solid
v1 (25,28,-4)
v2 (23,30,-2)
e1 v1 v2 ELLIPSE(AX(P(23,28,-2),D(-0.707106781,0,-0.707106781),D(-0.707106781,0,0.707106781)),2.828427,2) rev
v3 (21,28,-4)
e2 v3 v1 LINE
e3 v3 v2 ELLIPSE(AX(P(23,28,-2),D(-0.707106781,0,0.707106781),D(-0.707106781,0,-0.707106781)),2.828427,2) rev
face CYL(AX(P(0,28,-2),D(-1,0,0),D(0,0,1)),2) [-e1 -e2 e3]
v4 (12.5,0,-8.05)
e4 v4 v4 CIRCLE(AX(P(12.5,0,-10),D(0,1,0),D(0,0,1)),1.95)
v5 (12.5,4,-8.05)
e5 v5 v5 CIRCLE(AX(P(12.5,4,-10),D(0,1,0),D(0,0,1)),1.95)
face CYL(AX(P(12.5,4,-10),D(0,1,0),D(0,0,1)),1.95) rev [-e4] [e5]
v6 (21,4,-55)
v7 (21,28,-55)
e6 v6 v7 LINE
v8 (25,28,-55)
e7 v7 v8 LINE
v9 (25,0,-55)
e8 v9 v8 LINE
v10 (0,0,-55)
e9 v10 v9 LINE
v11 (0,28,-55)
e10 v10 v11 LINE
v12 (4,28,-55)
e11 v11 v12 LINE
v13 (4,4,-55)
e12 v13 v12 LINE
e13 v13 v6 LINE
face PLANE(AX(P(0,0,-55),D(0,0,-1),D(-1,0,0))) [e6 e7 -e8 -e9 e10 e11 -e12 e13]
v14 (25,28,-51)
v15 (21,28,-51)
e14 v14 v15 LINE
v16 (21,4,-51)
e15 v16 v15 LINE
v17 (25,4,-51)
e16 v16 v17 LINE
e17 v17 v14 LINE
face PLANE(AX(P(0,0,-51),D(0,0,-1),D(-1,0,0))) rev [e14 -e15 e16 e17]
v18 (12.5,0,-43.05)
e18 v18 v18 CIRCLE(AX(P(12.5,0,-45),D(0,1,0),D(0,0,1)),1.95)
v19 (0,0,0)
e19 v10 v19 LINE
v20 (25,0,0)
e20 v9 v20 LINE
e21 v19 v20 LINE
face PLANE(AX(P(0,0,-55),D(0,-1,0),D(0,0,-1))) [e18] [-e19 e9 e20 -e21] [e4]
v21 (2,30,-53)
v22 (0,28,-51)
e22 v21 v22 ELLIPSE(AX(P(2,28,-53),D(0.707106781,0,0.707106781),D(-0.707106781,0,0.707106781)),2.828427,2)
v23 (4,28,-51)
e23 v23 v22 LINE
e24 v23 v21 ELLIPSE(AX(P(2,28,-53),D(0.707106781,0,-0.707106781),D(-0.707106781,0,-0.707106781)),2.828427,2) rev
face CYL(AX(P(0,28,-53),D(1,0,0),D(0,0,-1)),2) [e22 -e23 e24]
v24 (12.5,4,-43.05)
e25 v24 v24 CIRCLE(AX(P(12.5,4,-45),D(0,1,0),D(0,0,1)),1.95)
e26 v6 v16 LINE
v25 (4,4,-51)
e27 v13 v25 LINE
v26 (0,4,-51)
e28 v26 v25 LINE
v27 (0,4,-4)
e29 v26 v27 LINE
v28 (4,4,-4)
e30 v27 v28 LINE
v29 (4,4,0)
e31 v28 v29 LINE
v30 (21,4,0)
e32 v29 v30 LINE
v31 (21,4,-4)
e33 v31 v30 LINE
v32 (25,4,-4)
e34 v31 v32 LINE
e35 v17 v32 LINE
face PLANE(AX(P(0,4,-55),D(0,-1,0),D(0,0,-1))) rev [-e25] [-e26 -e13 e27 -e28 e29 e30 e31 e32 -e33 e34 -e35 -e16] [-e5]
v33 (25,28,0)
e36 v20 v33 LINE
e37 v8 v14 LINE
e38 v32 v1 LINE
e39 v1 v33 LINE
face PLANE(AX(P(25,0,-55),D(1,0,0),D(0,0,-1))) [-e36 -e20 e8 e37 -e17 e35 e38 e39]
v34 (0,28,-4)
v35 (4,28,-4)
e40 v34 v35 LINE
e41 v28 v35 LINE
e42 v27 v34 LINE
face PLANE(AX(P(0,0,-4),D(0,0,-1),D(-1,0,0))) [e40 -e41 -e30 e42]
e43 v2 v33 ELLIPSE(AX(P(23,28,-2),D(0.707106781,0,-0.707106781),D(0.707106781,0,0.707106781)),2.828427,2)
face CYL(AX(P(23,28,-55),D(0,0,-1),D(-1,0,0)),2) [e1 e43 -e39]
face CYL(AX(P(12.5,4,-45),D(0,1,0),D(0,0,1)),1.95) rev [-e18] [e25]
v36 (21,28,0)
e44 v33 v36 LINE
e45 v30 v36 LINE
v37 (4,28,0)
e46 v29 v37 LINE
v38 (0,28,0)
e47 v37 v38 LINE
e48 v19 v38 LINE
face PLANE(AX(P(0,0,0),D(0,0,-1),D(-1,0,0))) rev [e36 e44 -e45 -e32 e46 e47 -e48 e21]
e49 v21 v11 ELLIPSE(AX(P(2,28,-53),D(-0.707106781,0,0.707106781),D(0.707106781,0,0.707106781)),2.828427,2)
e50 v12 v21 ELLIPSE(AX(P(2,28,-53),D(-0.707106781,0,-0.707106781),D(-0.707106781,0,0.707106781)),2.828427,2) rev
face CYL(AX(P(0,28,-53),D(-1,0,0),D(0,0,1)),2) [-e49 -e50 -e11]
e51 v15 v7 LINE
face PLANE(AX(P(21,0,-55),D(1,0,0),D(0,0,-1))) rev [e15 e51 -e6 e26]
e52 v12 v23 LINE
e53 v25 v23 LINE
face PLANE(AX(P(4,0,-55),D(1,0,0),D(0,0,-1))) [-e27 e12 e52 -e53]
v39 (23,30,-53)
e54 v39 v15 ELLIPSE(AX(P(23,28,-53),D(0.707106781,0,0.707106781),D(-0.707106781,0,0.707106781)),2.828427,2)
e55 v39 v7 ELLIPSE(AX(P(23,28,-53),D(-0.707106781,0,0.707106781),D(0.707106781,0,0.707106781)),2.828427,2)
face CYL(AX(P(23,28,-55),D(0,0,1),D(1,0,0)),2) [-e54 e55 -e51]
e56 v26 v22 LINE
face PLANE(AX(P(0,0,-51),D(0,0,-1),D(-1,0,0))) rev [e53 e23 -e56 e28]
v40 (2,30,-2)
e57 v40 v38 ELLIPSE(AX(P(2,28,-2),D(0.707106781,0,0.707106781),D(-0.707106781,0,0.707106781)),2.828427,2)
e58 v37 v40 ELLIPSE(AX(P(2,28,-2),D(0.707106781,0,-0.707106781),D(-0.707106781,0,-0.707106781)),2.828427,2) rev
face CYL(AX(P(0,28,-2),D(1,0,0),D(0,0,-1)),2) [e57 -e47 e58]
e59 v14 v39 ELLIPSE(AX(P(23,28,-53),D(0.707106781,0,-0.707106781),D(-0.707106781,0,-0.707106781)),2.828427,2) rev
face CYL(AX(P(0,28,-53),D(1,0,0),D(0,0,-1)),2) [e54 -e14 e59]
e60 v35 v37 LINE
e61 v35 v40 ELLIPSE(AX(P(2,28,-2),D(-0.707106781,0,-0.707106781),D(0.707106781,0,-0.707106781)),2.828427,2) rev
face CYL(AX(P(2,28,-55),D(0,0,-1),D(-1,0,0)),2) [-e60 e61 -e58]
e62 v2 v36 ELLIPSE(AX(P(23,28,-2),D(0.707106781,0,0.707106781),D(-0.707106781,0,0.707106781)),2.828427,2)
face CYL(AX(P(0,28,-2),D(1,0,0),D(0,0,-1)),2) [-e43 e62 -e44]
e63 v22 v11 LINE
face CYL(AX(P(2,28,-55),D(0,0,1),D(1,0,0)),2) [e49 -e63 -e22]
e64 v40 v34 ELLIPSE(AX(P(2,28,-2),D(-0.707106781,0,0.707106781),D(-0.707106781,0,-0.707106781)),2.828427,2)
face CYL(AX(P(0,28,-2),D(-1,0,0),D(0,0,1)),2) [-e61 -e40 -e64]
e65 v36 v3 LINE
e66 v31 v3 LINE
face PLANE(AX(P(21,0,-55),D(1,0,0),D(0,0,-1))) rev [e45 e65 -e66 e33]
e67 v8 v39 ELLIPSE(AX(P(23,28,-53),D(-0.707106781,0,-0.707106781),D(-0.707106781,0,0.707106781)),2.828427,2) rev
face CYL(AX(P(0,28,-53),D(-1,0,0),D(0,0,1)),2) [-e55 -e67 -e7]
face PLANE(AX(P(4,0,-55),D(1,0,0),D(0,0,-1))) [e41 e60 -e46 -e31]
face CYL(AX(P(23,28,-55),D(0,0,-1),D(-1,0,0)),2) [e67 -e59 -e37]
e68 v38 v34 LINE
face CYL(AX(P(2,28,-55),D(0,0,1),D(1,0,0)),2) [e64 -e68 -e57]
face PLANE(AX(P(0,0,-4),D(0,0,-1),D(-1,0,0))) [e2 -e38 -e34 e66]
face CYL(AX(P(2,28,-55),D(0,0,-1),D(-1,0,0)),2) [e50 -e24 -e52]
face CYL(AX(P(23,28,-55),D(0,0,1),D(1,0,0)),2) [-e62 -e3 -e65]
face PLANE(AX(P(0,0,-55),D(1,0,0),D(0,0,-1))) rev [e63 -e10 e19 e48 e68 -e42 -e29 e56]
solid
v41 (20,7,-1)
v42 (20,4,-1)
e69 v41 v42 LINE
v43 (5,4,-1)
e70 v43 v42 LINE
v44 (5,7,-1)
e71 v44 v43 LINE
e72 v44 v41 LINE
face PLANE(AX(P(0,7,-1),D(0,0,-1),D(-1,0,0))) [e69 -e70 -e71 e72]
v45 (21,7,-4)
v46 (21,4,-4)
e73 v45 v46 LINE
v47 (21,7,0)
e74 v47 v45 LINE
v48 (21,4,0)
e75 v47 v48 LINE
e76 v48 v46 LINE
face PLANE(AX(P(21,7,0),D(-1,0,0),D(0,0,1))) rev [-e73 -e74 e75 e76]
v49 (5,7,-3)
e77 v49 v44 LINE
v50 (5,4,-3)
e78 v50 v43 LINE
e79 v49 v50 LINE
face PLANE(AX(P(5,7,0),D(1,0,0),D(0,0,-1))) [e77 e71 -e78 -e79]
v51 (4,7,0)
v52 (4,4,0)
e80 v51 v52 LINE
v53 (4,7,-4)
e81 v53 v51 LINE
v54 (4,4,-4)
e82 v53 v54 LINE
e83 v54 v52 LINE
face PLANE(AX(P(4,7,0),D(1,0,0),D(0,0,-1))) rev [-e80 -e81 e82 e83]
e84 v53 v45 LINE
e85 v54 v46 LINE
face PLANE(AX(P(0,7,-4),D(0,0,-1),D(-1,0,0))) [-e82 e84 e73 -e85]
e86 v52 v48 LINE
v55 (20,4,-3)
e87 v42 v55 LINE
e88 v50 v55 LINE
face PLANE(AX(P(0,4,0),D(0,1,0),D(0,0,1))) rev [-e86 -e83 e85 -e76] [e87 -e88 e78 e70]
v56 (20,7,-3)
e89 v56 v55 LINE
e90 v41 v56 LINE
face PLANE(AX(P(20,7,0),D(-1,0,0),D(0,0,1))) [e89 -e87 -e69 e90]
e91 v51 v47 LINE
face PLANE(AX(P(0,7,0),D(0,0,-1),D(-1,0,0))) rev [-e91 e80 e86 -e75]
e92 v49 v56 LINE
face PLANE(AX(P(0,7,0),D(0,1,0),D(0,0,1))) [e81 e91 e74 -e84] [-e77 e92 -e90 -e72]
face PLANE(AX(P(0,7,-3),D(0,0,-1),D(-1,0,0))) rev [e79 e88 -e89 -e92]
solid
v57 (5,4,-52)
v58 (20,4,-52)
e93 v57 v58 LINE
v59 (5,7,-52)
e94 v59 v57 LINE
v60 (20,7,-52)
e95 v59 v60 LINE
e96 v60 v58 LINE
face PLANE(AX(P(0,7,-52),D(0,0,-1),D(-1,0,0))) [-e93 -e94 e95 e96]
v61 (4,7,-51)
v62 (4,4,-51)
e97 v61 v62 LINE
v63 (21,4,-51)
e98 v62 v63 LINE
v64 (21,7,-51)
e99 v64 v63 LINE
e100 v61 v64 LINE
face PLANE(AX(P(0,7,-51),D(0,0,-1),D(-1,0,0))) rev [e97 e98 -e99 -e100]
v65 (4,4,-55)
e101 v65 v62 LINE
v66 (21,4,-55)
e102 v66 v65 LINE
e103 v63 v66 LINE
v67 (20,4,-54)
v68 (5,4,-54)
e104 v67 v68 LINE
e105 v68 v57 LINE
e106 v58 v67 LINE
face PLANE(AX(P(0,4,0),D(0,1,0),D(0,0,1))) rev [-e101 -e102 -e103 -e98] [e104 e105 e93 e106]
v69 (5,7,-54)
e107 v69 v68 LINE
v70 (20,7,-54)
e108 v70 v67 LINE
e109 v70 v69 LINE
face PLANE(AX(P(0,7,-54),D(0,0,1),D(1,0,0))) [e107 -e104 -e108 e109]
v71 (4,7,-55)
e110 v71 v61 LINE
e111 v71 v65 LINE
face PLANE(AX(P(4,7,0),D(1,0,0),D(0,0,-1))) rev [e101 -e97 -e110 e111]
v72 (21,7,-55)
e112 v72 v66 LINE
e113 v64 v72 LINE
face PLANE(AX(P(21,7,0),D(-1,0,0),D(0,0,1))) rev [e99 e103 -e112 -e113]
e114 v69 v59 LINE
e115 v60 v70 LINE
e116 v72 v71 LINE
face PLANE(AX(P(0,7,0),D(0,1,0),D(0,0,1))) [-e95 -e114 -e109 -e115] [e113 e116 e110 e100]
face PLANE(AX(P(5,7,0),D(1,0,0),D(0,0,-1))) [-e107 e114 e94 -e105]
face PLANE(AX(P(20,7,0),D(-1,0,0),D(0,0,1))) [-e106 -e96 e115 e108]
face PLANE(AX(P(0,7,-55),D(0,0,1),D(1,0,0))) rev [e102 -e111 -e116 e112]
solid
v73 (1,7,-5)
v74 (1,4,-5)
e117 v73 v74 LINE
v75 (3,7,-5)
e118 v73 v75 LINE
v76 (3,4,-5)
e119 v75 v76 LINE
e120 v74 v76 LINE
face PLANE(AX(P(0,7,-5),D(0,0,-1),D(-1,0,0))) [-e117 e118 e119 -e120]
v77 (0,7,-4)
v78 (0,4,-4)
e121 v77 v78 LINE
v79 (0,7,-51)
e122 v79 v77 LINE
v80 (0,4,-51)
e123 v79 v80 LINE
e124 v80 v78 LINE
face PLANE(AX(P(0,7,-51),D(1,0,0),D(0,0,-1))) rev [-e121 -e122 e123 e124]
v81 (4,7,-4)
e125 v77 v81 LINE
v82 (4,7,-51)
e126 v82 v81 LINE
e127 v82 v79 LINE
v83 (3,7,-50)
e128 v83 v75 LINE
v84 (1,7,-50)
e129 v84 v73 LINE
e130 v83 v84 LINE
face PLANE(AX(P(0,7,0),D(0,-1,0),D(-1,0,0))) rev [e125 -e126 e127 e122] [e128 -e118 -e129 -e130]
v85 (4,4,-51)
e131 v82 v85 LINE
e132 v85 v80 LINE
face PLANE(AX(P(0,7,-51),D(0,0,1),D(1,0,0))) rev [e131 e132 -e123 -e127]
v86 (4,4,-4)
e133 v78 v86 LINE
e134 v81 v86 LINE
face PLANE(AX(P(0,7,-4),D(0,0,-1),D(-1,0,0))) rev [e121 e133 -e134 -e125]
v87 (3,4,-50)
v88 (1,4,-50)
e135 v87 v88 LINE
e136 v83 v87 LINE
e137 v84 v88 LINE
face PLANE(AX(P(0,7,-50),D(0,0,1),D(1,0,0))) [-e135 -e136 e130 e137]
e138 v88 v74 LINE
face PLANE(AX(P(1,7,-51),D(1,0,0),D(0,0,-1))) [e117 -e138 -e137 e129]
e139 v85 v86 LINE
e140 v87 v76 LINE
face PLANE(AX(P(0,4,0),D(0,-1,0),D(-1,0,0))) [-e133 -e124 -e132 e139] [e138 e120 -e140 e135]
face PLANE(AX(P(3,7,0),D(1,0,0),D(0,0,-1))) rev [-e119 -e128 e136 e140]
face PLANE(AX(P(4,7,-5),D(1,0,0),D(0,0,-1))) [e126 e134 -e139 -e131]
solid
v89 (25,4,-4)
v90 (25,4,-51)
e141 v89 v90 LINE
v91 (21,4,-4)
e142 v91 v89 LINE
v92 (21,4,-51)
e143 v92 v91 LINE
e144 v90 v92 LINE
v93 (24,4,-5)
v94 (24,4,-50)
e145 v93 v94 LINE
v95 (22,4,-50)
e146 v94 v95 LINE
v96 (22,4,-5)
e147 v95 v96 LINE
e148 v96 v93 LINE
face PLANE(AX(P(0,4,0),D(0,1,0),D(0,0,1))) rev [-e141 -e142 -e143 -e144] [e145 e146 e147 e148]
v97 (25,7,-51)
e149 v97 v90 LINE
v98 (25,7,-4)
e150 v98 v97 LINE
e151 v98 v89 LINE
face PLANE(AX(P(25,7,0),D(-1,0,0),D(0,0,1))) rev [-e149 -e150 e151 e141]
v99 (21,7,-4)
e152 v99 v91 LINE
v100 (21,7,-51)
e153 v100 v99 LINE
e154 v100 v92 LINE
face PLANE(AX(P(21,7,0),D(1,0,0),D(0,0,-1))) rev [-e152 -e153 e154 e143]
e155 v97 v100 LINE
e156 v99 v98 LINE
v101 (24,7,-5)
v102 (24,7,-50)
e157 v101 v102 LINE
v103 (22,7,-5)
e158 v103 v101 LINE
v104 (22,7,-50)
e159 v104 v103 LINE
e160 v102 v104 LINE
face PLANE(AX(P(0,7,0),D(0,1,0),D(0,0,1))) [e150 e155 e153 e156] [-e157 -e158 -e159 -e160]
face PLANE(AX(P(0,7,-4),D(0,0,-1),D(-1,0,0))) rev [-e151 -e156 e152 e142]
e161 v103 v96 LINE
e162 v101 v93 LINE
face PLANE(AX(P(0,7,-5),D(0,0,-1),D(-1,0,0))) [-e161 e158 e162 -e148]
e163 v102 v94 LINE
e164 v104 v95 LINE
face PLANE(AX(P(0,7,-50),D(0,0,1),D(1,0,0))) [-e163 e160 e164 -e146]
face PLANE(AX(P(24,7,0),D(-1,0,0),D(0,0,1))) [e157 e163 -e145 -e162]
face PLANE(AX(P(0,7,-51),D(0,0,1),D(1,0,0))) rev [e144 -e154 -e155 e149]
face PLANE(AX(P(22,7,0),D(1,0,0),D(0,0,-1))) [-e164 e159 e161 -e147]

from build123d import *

# Parameters (mm, degrees)
SKETCH1_W                           = 25
SKETCH1_H                           = 30
BOSS_EXTRUDE2_DEPTH                 = 55
SHELL14_T                           = -4
SHELL15_START                       = 4
SHELL15_OUTLINE_W                   = 26
SHELL15_OUTLINE_H                   = 4
SHELL15_DEPTH                       = 17
EXTRUDE_THIN1_OUTLINE_W             = 4
EXTRUDE_THIN1_OUTLINE_H             = 47
EXTRUDE_THIN1_OUTLINE_W_2           = 2
EXTRUDE_THIN1_OUTLINE_H_2           = 45
EXTRUDE_THIN1_OUTLINE_W_3           = 17
EXTRUDE_THIN1_OUTLINE_H_3           = 4
EXTRUDE_THIN1_OUTLINE_W_4           = 15
EXTRUDE_THIN1_OUTLINE_H_4           = 2
EXTRUDE_THIN1_DEPTH                 = 3
SKETCH20_W                          = 1.95
SKETCH20_H                          = 4
F_6_0_204_DIAMETER_HOLE2_AT_2_COUNT = 2
F_6_0_204_DIAMETER_HOLE2_AT_2_PITCH = 35
FILLET1_R                           = 2


# Read off the part's stored shape, not the designer's step: Shell15, Extrude-Thin1
with BuildPart() as part:
    # Sketch1 → Boss-Extrude2 (new body)
    with BuildSketch(Plane.XY):
        with Locations((12.5, 15)):
            Rectangle(SKETCH1_W, SKETCH1_H)
    extrude(amount=-BOSS_EXTRUDE2_DEPTH)

    # Shell14
    shell14_openings = [part.faces().sort_by_distance(p)[0] for p in [
        (25, 15, -27.5),
        (12.5, 30, -27.5),
        (0, 15, -27.5),
    ]]
    offset(amount=SHELL14_T, openings=shell14_openings, kind=Kind.INTERSECTION)

    # Shell15 outline → Shell15 (cut)
    with BuildSketch(Plane.YZ.offset(SHELL15_START)):
        with Locations((17, -53)):
            Rectangle(SHELL15_OUTLINE_W, SHELL15_OUTLINE_H)
        with Locations((17, -2)):
            Rectangle(SHELL15_OUTLINE_W, SHELL15_OUTLINE_H)
    extrude(amount=SHELL15_DEPTH, mode=Mode.SUBTRACT)

    # Sketch20 → #6 (0.204) Diameter Hole2 (revolve, cut)
    with BuildSketch(Plane(origin=(12.5, 4, -45), x_dir=(0, 0, 1), z_dir=(1, 0, 0))):
        with Locations((0.975, 2)):
            Rectangle(SKETCH20_W, SKETCH20_H)
    f_6_0_204_diameter_hole2 = revolve(axis=Axis((12.5, 10.35, -45), (0, -1, 0)), mode=Mode.SUBTRACT)

    # #6 (0.204) Diameter Hole2 at 2: #6 (0.204) Diameter Hole2 ×2
    with Locations(*[(0, 0, i * F_6_0_204_DIAMETER_HOLE2_AT_2_PITCH) for i in range(1, F_6_0_204_DIAMETER_HOLE2_AT_2_COUNT)]):
        add(f_6_0_204_diameter_hole2, mode=Mode.SUBTRACT)

    # Fillet1
    fillet1_edges = [part.edges().sort_by_distance(p)[0] for p in [
        (25, 30, -2),
        (0, 30, -2),
        (2, 30, -4),
        (2, 30, -51),
        (23, 30, -4),
        (23, 30, -51),
        (23, 30, 0),
        (23, 30, -55),
        (21, 30, -53),
        (4, 30, -53),
        (4, 30, -2),
        (21, 30, -2),
        (2, 30, 0),
        (25, 30, -53),
        (0, 30, -53),
        (2, 30, -55),
    ]]
    fillet(fillet1_edges, radius=FILLET1_R - 0.0001)  # a hair under: the kernel refuses the full size


with BuildPart() as body_2:
    # Extrude-Thin1 outline → Extrude-Thin1 (new body)
    # profile 1 of 4: a face of its own
    with BuildSketch(Plane(origin=(0, 4, 0), x_dir=(1, 0, 0), z_dir=(0, 1, 0))):
        with Locations((23, 27.5)):
            Rectangle(EXTRUDE_THIN1_OUTLINE_W, EXTRUDE_THIN1_OUTLINE_H)
        with Locations((23, 27.5)):
            Rectangle(EXTRUDE_THIN1_OUTLINE_W_2, EXTRUDE_THIN1_OUTLINE_H_2, mode=Mode.SUBTRACT)
    # profile 2 of 4: a face of its own
    with BuildSketch(Plane(origin=(0, 4, 0), x_dir=(1, 0, 0), z_dir=(0, 1, 0))):
        with Locations((12.5, 53)):
            Rectangle(EXTRUDE_THIN1_OUTLINE_W_3, EXTRUDE_THIN1_OUTLINE_H_3)
        with Locations((12.5, 53)):
            Rectangle(EXTRUDE_THIN1_OUTLINE_W_4, EXTRUDE_THIN1_OUTLINE_H_4, mode=Mode.SUBTRACT)
    # profile 3 of 4: a face of its own
    with BuildSketch(Plane(origin=(0, 4, 0), x_dir=(1, 0, 0), z_dir=(0, 1, 0))):
        with Locations((2, 27.5)):
            Rectangle(EXTRUDE_THIN1_OUTLINE_W, EXTRUDE_THIN1_OUTLINE_H)
        with Locations((2, 27.5)):
            Rectangle(EXTRUDE_THIN1_OUTLINE_W_2, EXTRUDE_THIN1_OUTLINE_H_2, mode=Mode.SUBTRACT)
    # profile 4 of 4: a face of its own
    with BuildSketch(Plane(origin=(0, 4, 0), x_dir=(1, 0, 0), z_dir=(0, 1, 0))):
        with Locations((12.5, 2)):
            Rectangle(EXTRUDE_THIN1_OUTLINE_W_3, EXTRUDE_THIN1_OUTLINE_H_3)
        with Locations((12.5, 2)):
            Rectangle(EXTRUDE_THIN1_OUTLINE_W_4, EXTRUDE_THIN1_OUTLINE_H_4, mode=Mode.SUBTRACT)
    extrude(amount=EXTRUDE_THIN1_DEPTH)


solid = Compound([part.part, body_2.part])
